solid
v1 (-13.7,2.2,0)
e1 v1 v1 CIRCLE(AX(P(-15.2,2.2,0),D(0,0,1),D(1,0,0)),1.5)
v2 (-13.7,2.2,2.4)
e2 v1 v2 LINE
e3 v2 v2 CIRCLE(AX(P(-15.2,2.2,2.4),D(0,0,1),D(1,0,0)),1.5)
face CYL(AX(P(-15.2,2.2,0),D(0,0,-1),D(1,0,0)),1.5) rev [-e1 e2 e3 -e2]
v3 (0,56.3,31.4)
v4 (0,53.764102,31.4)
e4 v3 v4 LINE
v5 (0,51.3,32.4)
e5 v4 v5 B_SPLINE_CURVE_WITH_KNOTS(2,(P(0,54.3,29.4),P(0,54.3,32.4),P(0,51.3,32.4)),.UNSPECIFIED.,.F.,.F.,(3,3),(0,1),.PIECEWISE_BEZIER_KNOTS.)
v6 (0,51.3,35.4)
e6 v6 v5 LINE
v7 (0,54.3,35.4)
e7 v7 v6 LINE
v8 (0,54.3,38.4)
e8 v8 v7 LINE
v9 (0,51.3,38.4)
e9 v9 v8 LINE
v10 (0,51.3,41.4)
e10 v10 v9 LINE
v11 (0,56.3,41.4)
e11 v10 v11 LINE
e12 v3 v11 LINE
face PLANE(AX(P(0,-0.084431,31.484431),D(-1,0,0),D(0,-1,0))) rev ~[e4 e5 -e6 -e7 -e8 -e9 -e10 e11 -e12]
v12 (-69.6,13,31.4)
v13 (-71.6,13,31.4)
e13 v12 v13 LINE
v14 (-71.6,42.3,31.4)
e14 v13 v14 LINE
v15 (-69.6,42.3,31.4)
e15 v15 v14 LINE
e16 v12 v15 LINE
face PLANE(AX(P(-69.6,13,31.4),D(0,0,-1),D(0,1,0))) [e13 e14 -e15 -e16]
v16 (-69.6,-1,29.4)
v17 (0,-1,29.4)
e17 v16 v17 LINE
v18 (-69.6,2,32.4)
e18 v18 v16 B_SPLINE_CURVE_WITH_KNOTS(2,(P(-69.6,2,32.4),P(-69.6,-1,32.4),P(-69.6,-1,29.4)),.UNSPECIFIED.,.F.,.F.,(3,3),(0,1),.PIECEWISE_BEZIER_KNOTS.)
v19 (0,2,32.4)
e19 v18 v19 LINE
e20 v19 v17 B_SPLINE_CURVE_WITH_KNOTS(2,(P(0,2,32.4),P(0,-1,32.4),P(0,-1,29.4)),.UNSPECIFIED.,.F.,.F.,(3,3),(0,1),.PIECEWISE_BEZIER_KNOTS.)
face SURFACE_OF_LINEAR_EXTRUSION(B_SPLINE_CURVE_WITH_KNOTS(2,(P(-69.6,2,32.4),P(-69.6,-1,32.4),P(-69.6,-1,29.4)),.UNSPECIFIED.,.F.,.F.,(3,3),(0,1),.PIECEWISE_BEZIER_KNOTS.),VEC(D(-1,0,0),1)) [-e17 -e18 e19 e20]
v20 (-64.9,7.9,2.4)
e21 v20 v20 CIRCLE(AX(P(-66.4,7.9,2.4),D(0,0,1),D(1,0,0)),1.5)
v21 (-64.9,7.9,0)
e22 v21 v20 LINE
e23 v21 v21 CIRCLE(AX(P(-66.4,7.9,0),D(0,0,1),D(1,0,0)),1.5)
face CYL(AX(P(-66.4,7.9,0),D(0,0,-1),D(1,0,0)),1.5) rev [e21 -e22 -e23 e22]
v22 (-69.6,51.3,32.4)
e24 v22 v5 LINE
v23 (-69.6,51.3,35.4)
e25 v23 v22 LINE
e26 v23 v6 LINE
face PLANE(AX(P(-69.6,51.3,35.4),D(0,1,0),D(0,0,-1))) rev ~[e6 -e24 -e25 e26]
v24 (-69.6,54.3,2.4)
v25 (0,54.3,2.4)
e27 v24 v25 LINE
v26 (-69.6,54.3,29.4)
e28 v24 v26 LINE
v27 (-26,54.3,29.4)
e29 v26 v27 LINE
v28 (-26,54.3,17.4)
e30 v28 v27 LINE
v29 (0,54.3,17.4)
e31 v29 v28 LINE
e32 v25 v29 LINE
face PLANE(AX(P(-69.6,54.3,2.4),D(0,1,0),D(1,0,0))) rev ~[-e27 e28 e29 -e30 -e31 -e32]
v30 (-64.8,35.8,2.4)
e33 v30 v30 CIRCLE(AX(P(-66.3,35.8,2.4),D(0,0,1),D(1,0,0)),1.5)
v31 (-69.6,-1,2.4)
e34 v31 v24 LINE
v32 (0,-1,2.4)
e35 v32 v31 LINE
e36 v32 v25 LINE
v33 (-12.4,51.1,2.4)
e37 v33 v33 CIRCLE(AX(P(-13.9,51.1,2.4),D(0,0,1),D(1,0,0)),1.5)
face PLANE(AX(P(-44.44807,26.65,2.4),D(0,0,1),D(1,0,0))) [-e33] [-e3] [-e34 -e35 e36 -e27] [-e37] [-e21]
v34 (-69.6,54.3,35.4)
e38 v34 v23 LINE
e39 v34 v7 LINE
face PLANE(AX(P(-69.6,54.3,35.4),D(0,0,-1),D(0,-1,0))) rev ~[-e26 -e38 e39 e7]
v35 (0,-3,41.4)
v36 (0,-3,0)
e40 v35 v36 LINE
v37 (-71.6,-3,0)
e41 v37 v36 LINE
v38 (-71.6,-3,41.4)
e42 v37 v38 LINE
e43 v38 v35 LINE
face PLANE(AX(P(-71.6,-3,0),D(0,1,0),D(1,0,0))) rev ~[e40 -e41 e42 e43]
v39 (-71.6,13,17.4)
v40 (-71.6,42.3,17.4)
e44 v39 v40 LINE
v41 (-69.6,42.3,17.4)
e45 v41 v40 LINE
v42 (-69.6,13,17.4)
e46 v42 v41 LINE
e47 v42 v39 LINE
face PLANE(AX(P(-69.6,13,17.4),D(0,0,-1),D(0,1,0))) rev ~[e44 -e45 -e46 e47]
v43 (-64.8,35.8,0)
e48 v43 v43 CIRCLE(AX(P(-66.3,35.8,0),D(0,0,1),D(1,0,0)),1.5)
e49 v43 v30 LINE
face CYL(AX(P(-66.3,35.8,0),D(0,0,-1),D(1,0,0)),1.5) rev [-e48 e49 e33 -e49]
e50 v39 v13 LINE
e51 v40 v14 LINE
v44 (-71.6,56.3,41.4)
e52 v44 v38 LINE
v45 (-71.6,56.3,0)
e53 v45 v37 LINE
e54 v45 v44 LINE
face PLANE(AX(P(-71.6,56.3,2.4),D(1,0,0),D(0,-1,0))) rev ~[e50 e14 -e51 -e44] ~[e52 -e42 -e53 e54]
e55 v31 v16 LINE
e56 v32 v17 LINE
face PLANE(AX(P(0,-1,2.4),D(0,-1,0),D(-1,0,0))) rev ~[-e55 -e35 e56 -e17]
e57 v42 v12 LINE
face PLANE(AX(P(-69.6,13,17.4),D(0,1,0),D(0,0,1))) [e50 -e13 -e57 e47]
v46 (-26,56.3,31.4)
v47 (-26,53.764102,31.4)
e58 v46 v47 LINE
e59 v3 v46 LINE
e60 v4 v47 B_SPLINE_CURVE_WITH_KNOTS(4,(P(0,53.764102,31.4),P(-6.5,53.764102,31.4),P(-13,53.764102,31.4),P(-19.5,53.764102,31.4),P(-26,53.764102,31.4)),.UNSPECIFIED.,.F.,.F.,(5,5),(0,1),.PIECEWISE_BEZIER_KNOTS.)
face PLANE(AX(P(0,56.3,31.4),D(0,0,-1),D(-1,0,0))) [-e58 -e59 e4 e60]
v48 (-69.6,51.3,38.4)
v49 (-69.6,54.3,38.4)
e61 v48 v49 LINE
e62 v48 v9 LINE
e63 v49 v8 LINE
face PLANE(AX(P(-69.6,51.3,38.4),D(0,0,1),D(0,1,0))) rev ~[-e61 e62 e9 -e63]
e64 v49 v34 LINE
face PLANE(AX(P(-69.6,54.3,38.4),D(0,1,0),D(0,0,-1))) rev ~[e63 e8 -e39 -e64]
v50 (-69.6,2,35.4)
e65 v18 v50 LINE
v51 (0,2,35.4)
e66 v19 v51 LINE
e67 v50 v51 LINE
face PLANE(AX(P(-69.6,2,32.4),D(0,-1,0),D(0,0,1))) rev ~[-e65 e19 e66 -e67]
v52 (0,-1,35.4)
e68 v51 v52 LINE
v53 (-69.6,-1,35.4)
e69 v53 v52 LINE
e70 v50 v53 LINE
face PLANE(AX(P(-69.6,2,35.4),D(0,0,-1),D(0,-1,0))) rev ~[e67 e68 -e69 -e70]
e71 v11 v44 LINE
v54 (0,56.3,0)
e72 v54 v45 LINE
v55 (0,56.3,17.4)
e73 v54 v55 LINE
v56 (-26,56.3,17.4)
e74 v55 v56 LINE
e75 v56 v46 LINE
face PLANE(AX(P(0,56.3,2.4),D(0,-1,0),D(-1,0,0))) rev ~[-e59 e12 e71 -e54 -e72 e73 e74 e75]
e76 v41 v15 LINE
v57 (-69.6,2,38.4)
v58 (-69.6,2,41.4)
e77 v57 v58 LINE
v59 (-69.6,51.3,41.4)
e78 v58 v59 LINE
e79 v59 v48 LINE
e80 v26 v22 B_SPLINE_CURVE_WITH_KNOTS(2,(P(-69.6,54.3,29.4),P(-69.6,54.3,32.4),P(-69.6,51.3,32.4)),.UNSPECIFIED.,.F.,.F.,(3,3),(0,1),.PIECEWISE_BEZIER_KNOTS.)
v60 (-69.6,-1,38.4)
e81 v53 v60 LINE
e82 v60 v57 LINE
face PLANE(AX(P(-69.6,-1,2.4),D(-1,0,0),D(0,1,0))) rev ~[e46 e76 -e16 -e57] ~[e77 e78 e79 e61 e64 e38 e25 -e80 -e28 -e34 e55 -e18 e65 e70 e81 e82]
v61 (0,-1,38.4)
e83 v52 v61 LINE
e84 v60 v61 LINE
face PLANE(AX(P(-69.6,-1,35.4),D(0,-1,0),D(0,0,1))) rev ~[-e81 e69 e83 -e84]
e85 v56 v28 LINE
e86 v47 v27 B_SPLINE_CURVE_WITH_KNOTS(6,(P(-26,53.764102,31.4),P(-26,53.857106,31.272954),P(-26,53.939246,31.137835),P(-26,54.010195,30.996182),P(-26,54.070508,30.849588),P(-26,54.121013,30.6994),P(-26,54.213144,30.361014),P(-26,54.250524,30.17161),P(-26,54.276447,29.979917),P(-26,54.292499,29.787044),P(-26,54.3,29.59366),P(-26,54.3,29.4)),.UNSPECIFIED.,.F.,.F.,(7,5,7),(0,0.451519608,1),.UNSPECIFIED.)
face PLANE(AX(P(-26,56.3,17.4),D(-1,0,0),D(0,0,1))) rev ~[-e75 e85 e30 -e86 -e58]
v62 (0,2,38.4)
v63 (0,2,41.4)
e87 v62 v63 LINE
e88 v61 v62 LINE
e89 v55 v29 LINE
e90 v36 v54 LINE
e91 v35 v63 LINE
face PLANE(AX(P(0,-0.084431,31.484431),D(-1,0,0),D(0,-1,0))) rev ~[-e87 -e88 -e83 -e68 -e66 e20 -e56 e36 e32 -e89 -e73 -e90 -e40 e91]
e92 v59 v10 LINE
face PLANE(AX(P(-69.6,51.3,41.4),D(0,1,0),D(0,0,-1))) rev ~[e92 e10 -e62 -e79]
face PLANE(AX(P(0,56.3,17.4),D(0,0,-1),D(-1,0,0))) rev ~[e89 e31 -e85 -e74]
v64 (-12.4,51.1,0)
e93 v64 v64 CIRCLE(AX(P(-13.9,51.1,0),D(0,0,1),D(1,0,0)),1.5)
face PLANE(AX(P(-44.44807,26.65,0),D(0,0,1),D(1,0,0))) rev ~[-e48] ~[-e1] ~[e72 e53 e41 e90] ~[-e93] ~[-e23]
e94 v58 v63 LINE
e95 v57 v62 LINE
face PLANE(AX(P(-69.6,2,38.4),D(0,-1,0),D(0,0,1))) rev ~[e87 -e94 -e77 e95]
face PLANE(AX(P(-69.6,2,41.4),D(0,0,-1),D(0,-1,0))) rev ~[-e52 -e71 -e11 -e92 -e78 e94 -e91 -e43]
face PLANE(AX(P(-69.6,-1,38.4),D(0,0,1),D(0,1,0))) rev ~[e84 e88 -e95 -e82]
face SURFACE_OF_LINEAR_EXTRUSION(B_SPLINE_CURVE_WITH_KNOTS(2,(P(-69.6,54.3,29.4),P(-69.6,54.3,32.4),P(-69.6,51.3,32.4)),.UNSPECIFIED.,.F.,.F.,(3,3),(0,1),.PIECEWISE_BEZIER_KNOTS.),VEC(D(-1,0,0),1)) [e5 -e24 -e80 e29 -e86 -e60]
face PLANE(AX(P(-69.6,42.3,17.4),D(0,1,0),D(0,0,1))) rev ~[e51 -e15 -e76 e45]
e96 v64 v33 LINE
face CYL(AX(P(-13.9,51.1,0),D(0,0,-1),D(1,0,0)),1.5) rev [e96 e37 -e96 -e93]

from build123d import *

# Parameters (mm, degrees)
F1_W        = 68.6
F1_H        = 53.3
F1_R        = 1.5
F2_DEPTH    = 2.4
F4_DEPTH    = 39
F6_DEPTH    = 69.6
F7_T1_DEPTH = 69.6
F8_W        = 29.3
F8_H        = 14
F9_DEPTH    = 25.4
F10_W       = 26
F10_H       = 14
F11_DEPTH   = 25.4


# Not quite as in the source:
# - a fillet or chamfer that OpenCascade refuses, or shapes differently, is made with other operations: its cross-section is extruded or revolved along the edge and cut away or added


with BuildPart() as f2:
    # F1 (on Top) → F2 (new body)
    with BuildSketch(Plane.XY):
        Polygon((-68.6, 0), (-68.6, 53.3), (0, 53.3), (0, 56.3), (-71.6, 56.3), (-71.6, -3), (0, -3), (0, 0), align=None)
        with Locations((-34.3, 26.65)):
            Rectangle(F1_W, F1_H)
        with Locations((-66.4, 7.9)):
            Circle(F1_R, mode=Mode.SUBTRACT)
        with Locations((-15.2, 2.2)):
            Circle(F1_R, mode=Mode.SUBTRACT)
        with Locations((-66.3, 35.8)):
            Circle(F1_R, mode=Mode.SUBTRACT)
        with Locations((-13.9, 51.1)):
            Circle(F1_R, mode=Mode.SUBTRACT)
    extrude(amount=F2_DEPTH)

    # F3 (on face) → F4 (join)
    with BuildSketch(Plane.XY.offset(2.4)):
        Polygon((0, 54.3), (0, 56.3), (-71.6, 56.3), (-71.6, -3), (0, -3), (0, -1), (-69.6, -1), (-69.6, 54.3), align=None)
    extrude(amount=F4_DEPTH)

    # F5 (on face) → F6 (join, through all)
    with BuildSketch(Plane.YZ.offset(-69.6)):
        Polygon((2, 41.4), (-1, 41.4), (-2.3718131706, 41.4), (-2.3718131706, 32.4), (-1, 32.4), (2, 32.4), (2, 35.4), (-1, 35.4), (-1, 38.4), (2, 38.4), align=None)
        Polygon((55.6718131706, 32.4), (55.6718131706, 41.4), (54.3, 41.4), (51.3, 41.4), (51.3, 38.4), (54.3, 38.4), (54.3, 35.4), (51.3, 35.4), (51.3, 32.4), (54.3, 32.4), align=None)
    extrude(amount=F6_DEPTH)

    # F7: fillet of radius 3 on 2 edges, made by hand

    # F7_s2 → F7_t1 (join)
    with BuildSketch(Plane.YZ.offset(-69.6)):
        with BuildLine():
            add(Edge.make_bspline(
                [(2, 32.4), (-1, 32.4), (-1, 29.4)],
                knots=[0, 0, 0, 1, 1, 1], degree=2, weights=[1, 1, 1]))
            Line((-1, 29.4), (-1, 32.4))
            Line((-1, 32.4), (2, 32.4))
        make_face()
        with BuildLine():
            add(Edge.make_bspline(
                [(54.3, 29.4), (54.3, 32.4), (51.3, 32.4)],
                knots=[0, 0, 0, 1, 1, 1], degree=2, weights=[1, 1, 1]))
            Line((51.3, 32.4), (54.3, 32.4))
            Line((54.3, 32.4), (54.3, 29.4))
        make_face()
    extrude(amount=F7_T1_DEPTH)

    # F8 (on face) → F9 (cut)
    with BuildSketch(Plane.YZ.offset(-69.6)):
        with Locations((27.65, 24.4)):
            Rectangle(F8_W, F8_H)
    extrude(amount=-F9_DEPTH, mode=Mode.SUBTRACT)

    # F10 (on face) → F11 (cut)
    with BuildSketch(Plane(origin=(0, 56.3, 0), x_dir=(-1, 0, 0), z_dir=(0, 1, 0))):
        with Locations((13, 24.4)):
            Rectangle(F10_W, F10_H)
    extrude(amount=-F11_DEPTH, mode=Mode.SUBTRACT)


solid = f2.part
